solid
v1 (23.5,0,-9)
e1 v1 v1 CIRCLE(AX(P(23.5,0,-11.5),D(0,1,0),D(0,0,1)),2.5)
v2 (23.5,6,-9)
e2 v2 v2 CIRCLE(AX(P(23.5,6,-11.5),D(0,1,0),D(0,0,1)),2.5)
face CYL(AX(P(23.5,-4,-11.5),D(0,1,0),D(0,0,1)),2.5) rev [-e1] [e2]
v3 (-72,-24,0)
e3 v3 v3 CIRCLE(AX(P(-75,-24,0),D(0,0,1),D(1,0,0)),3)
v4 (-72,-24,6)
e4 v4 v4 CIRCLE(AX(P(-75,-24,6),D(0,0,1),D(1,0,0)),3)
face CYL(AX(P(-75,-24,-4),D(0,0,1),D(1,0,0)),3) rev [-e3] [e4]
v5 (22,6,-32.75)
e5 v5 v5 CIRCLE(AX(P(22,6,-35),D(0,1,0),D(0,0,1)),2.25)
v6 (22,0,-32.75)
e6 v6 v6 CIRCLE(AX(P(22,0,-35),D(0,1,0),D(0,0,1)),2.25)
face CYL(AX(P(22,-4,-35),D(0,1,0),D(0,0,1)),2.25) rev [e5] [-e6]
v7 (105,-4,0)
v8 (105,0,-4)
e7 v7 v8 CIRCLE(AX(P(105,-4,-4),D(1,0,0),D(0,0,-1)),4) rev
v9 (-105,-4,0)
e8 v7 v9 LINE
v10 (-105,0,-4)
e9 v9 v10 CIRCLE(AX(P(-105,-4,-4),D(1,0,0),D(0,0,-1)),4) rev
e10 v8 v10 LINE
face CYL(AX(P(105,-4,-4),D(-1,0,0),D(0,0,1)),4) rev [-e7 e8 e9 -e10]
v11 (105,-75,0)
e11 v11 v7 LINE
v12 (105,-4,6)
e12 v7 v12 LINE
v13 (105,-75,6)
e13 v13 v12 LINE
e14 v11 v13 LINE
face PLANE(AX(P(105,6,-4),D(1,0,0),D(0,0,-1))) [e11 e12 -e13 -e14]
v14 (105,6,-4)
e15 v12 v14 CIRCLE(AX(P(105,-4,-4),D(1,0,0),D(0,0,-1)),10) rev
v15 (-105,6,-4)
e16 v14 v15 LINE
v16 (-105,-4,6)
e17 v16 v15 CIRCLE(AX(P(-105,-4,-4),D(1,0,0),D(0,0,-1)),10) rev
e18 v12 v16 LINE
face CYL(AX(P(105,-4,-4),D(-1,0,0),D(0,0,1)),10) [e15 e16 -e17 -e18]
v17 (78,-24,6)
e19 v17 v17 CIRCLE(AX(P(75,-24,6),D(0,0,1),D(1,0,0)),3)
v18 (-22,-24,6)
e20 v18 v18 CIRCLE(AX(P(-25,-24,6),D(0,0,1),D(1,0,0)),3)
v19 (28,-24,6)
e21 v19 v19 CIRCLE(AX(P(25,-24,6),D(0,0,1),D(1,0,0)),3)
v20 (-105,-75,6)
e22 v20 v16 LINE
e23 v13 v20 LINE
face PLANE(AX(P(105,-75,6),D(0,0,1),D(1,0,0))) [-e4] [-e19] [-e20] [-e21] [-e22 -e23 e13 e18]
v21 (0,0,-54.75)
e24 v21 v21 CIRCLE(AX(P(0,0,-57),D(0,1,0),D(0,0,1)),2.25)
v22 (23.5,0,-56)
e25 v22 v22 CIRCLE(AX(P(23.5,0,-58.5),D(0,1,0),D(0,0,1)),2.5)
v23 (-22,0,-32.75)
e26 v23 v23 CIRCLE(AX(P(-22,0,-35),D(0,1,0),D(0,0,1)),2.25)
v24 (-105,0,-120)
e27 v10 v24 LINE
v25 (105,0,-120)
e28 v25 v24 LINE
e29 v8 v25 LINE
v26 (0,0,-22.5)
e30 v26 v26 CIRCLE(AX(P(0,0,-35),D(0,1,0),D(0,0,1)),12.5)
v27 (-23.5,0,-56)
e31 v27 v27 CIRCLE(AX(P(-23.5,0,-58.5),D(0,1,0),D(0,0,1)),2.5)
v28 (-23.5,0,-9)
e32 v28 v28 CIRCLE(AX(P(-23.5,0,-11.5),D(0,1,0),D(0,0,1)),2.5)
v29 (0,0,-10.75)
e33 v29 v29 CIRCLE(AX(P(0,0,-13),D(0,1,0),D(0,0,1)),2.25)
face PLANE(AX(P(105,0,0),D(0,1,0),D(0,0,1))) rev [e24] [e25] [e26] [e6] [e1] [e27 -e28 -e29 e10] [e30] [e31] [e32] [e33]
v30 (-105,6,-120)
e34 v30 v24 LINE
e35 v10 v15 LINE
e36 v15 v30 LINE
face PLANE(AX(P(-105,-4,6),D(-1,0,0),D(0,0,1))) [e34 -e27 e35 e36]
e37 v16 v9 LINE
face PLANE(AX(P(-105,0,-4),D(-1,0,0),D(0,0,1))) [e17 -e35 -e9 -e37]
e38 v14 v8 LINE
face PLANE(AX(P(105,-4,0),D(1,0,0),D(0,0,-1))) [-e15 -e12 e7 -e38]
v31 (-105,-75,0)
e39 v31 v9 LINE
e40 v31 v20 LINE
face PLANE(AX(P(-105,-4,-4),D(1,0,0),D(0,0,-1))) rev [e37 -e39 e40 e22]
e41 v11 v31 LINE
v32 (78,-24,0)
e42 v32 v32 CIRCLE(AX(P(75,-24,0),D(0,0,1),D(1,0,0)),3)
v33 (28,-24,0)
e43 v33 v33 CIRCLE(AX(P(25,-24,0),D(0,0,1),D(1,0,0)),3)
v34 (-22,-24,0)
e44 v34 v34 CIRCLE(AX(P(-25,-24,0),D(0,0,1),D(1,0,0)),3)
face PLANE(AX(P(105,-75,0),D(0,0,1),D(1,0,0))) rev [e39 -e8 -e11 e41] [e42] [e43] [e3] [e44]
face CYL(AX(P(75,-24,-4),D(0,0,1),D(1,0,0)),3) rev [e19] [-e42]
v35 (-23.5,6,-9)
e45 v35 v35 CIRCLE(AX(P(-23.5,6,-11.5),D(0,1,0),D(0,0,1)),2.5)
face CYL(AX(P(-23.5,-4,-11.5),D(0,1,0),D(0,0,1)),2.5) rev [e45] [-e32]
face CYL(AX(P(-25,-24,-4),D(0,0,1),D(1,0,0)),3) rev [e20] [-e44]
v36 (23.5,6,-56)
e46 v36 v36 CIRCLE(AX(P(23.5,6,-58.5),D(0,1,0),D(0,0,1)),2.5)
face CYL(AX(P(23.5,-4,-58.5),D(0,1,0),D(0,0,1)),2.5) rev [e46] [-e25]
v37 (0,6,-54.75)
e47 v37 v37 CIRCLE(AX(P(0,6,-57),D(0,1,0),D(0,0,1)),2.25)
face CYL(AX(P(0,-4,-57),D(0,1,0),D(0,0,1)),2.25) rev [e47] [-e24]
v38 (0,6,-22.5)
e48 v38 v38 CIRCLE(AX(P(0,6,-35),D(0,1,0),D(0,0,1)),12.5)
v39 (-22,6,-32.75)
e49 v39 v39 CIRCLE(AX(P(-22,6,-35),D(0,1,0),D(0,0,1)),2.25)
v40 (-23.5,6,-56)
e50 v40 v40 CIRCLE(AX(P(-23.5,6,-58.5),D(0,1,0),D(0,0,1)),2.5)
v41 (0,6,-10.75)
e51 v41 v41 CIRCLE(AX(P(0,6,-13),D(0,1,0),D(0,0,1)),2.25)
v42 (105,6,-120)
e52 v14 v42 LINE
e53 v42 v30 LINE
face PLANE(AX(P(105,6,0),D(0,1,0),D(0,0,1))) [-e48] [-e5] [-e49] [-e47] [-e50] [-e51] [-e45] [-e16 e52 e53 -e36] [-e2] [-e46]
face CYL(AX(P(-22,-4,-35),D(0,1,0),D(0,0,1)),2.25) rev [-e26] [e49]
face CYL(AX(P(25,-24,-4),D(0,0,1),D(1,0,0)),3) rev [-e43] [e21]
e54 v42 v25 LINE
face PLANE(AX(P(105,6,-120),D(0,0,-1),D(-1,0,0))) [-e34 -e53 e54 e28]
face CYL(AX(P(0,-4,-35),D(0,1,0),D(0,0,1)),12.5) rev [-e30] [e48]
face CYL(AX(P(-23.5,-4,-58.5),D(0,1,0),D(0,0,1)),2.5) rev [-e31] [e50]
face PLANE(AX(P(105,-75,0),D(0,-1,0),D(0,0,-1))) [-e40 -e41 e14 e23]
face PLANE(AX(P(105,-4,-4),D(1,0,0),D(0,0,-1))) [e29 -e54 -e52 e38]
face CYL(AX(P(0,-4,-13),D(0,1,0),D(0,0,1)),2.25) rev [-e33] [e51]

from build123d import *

# Parameters (mm, degrees)
BASE_FLANGE1_DEPTH = 105
SKETCH6_R          = 12.5
SKETCH6_R_2        = 2.5
CUT_EXTRUDE1_DEPTH = 10
SKETCH7_R          = 3
CUT_EXTRUDE2_DEPTH = 10
SKETCH8_R          = 2.25
CUT_EXTRUDE3_DEPTH = 10


# Sheet-metal steps are written as plain solids
with BuildPart() as part:
    # Sketch1 → Base-Flange1 (new, symmetric)
    with BuildSketch(Plane(origin=(0, 0, 0), x_dir=(0, 0, -1), z_dir=(1, 0, 0))):
        with BuildLine():
            Line((0, -75), (0, -4))
            ThreePointArc((0, -4), (1.171572875, -1.171572875), (4, 0))
            Line((4, 0), (120, 0))
            Line((120, 0), (120, 6))
            Line((120, 6), (4, 6))
            ThreePointArc((4, 6), (-3.071067812, 3.071067812), (-6, -4))
            Line((-6, -4), (-6, -75))
            Line((-6, -75), (0, -75))
        make_face()
    extrude(amount=BASE_FLANGE1_DEPTH, both=True)

    # Sketch6 → Cut-Extrude1 (cut)
    with BuildSketch(Plane(origin=(0, 6, 0), x_dir=(1, 0, 0), z_dir=(0, 1, 0))):
        with Locations(Location((0, 35, 0), (0, 0, 270))):
            Circle(SKETCH6_R)
        with Locations(Location((23.5, 58.5, 0), (0, 0, 270))):
            Circle(SKETCH6_R_2)
        with Locations(Location((-23.5, 58.5, 0), (0, 0, 270))):
            Circle(SKETCH6_R_2)
        with Locations(Location((-23.5, 11.5, 0), (0, 0, 270))):
            Circle(SKETCH6_R_2)
        with Locations(Location((23.5, 11.5, 0), (0, 0, 270))):
            Circle(SKETCH6_R_2)
    extrude(amount=-CUT_EXTRUDE1_DEPTH, mode=Mode.SUBTRACT)

    # Sketch7 → Cut-Extrude2 (cut)
    with BuildSketch(Plane.XY.offset(6)):
        with Locations((-75, -24)):
            Circle(SKETCH7_R)
        with Locations((-25, -24)):
            Circle(SKETCH7_R)
        with Locations((25, -24)):
            Circle(SKETCH7_R)
        with Locations((75, -24)):
            Circle(SKETCH7_R)
    extrude(amount=-CUT_EXTRUDE2_DEPTH, mode=Mode.SUBTRACT)

    # Sketch8 → Cut-Extrude3 (cut)
    with BuildSketch(Plane(origin=(0, 6, 0), x_dir=(1, 0, 0), z_dir=(0, 1, 0))):
        with Locations(Location((0, 13, 0), (0, 0, 270))):
            Circle(SKETCH8_R)
        with Locations(Location((-22, 35, 0), (0, 0, 270))):
            Circle(SKETCH8_R)
        with Locations(Location((0, 57, 0), (0, 0, 270))):
            Circle(SKETCH8_R)
        with Locations(Location((22, 35, 0), (0, 0, 270))):
            Circle(SKETCH8_R)
    extrude(amount=-CUT_EXTRUDE3_DEPTH, mode=Mode.SUBTRACT)


solid = part.part
